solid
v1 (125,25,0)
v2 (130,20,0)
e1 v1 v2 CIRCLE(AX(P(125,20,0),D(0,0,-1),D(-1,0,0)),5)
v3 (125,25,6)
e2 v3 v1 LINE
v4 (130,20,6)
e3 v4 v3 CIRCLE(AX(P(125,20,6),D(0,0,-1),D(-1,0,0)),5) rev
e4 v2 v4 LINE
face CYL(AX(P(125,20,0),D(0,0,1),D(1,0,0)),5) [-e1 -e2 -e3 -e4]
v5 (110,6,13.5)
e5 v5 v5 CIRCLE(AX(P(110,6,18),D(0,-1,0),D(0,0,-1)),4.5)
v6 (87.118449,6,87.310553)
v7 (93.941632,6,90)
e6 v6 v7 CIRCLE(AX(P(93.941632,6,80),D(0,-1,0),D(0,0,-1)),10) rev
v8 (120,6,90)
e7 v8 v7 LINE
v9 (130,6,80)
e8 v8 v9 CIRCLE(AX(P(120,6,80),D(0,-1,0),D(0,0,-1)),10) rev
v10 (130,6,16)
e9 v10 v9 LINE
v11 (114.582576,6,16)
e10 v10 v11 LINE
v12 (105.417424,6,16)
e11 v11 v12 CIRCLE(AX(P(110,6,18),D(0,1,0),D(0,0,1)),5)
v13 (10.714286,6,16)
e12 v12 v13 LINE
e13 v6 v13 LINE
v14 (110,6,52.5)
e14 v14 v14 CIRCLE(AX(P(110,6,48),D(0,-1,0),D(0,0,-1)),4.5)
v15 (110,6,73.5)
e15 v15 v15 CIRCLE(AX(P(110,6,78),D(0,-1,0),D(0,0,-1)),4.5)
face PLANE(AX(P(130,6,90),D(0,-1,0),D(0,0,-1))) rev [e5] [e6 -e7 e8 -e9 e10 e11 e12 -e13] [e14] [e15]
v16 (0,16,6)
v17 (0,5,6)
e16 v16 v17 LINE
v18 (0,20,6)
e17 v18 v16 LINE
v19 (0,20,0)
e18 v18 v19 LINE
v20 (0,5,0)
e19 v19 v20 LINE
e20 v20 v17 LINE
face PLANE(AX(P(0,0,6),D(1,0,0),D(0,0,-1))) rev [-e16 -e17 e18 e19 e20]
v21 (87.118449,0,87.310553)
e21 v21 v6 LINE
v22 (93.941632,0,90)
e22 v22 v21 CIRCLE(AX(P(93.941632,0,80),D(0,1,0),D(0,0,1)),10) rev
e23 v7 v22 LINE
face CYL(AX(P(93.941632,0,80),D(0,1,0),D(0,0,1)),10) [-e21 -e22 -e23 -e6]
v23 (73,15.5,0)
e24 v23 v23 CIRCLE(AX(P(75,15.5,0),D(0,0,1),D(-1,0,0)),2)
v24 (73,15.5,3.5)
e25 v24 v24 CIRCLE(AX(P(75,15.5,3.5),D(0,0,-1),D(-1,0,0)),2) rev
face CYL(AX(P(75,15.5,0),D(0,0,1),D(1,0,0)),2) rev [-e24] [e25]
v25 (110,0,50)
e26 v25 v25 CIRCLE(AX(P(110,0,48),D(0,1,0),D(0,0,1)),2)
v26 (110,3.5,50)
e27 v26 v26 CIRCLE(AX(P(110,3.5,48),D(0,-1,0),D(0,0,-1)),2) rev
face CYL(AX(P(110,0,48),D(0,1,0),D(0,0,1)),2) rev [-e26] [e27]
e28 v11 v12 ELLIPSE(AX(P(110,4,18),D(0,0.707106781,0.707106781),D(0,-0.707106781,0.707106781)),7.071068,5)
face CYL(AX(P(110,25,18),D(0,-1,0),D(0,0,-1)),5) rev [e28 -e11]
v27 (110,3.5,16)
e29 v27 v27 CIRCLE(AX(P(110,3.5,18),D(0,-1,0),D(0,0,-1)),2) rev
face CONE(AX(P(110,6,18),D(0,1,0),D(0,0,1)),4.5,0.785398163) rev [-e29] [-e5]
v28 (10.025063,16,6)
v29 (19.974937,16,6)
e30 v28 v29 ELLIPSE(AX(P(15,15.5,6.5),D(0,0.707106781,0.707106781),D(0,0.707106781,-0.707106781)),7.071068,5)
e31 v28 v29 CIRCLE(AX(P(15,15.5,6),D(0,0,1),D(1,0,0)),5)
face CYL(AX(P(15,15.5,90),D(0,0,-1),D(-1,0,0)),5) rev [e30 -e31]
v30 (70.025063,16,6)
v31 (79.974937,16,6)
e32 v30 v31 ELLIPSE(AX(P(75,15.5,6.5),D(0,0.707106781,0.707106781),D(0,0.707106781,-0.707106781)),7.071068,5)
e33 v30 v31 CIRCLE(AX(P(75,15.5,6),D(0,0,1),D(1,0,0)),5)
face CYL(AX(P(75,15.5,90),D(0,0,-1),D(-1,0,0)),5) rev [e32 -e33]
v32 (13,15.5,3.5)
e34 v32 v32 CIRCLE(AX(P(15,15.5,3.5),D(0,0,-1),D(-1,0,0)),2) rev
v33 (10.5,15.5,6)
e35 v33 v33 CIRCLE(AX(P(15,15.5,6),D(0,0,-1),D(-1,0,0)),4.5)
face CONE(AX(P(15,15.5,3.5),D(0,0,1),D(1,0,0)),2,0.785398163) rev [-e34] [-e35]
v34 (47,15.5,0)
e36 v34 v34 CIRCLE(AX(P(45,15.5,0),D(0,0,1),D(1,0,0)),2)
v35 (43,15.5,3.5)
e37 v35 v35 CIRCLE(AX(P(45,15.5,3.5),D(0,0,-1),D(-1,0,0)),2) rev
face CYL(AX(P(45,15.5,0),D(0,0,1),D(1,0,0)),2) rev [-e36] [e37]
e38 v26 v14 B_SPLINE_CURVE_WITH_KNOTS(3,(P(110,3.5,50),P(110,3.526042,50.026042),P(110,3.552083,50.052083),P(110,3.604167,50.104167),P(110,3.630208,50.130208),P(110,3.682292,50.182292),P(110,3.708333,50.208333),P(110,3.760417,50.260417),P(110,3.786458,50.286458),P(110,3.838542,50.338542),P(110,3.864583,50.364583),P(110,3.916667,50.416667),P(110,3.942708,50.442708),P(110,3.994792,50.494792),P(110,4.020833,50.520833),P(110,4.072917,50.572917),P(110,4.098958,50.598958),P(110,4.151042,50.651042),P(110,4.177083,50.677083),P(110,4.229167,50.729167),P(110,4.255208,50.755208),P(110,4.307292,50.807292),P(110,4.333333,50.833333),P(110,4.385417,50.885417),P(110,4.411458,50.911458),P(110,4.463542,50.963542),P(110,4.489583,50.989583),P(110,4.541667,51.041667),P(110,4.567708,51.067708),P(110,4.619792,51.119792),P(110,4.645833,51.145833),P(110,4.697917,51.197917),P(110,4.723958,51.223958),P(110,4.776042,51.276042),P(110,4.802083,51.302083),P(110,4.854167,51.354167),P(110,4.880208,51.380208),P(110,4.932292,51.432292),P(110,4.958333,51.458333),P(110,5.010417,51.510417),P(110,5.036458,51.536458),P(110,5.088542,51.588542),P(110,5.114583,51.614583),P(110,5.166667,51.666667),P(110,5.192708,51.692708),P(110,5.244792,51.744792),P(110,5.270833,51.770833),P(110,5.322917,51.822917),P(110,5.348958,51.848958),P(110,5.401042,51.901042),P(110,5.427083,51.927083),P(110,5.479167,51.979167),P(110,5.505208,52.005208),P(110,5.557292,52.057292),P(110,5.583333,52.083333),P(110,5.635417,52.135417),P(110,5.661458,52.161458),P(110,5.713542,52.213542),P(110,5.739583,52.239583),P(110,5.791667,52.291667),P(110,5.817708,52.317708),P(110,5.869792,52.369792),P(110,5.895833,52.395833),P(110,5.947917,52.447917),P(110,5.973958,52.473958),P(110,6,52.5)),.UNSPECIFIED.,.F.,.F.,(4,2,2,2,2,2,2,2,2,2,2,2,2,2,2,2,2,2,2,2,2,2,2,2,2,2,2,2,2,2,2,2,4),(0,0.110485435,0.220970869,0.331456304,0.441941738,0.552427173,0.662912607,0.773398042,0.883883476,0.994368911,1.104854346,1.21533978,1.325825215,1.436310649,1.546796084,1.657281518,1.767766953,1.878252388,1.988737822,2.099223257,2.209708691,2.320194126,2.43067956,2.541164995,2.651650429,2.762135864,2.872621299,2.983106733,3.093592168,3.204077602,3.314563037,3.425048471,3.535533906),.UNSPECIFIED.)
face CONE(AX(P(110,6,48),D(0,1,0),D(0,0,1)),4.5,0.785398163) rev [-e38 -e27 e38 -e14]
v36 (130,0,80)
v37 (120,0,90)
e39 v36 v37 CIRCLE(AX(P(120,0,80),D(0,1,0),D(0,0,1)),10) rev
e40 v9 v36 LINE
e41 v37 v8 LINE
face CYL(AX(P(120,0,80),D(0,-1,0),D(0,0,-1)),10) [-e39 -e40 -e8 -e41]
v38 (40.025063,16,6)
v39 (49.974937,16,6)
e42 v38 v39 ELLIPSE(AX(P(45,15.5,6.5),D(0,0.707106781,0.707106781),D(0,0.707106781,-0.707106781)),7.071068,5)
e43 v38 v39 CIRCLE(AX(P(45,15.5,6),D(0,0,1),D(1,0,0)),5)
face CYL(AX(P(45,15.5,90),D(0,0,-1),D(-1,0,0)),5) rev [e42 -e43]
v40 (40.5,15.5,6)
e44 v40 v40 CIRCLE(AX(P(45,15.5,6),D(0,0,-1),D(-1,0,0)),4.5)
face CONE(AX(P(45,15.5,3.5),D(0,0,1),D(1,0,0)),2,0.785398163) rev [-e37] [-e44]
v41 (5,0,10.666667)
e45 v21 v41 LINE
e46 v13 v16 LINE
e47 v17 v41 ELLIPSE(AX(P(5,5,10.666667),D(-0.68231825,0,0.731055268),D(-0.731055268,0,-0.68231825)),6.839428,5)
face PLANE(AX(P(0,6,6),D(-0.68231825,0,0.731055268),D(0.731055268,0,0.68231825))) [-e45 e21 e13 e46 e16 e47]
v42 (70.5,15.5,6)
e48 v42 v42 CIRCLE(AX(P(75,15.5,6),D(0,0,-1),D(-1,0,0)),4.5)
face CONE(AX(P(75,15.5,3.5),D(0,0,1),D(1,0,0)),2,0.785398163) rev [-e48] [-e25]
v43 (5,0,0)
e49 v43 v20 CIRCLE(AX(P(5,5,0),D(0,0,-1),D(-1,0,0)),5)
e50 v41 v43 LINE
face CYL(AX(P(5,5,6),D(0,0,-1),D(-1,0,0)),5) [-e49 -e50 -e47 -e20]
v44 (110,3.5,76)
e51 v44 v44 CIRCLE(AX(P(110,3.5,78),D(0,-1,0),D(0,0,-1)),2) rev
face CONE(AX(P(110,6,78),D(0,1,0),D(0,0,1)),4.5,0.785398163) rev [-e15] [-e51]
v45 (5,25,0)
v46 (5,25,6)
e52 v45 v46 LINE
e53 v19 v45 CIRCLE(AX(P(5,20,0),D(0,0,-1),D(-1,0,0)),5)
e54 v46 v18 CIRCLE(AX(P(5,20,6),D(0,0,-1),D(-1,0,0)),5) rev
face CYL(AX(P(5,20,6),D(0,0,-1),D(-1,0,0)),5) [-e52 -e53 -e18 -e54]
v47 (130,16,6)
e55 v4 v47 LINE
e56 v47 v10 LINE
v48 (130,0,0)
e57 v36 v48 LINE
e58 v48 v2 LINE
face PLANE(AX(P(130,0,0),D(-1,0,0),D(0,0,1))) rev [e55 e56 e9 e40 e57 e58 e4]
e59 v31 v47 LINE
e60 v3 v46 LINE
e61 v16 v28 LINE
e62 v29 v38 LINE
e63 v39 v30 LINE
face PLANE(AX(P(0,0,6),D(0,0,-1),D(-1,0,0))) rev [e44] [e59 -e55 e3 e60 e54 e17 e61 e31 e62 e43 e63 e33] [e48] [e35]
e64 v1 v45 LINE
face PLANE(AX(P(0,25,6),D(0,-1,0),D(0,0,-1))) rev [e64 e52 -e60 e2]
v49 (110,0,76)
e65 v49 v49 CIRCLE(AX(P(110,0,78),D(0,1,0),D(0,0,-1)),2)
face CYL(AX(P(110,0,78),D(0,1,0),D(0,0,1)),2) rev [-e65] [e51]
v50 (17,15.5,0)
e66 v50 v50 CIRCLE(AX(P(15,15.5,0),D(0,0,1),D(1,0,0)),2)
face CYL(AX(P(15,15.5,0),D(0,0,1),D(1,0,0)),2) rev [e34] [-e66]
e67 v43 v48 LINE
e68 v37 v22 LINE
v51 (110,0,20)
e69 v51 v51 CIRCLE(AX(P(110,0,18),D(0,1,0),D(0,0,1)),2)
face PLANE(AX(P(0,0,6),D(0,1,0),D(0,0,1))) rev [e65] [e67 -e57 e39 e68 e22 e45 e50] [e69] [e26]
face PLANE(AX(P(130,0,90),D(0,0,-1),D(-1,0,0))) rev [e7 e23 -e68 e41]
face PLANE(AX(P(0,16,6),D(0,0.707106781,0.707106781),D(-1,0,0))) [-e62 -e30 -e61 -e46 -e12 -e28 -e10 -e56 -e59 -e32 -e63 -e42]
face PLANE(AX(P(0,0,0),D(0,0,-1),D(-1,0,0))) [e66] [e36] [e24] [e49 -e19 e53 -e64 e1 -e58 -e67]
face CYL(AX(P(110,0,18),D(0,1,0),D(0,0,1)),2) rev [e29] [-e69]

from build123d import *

# Parameters (mm, degrees)
ESQUISSE1_W                  = 90
ESQUISSE1_H                  = 25
BOSS_EXTRU_1_DEPTH           = 6
ESQUISSE2_W                  = 90
ESQUISSE2_H                  = 6
BOSS_EXTRU_2_DEPTH           = 40
ESQUISSE3_W                  = 40
ESQUISSE3_H                  = 6
BOSS_EXTRU_3_DEPTH           = 19
BOSS_EXTRU_4_DEPTH           = 6
ESQUISSE5_R                  = 2
ENL_V_MAT_EXTRU_1_DEPTH      = 157.783289926
ENL_V_MAT_EXTRU_2_DEPTH      = 160.25137362
ENL_V_MAT_EXTRU_2_DEPTH_BACK = 160.25137362
ESQUISSE6_R                  = 2
CHANFREIN1_SIZE              = 10
ESQUISSE7_R                  = 5
ENL_V_MAT_EXTRU_3_DEPTH      = 157.783289926
ESQUISSE8_R                  = 5
ENL_V_MAT_EXTRU_4_DEPTH      = 160.25137362
CHANFREIN3_SIZE              = 2.5
CONG_1_R                     = 10
CONG_2_R                     = 5


with BuildPart() as part:
    # Esquisse1 → Boss.-Extru.1 (new body)
    with BuildSketch(Plane.XY):
        with Locations((45, 12.5)):
            Rectangle(ESQUISSE1_W, ESQUISSE1_H)
    extrude(amount=BOSS_EXTRU_1_DEPTH)

    # Esquisse2 → Boss.-Extru.2 (add)
    with BuildSketch(Plane(origin=(90, 0, 0), x_dir=(0, 0, -1), z_dir=(1, 0, 0))):
        with Locations((-45, 3)):
            Rectangle(ESQUISSE2_W, ESQUISSE2_H)
    extrude(amount=BOSS_EXTRU_2_DEPTH)

    # Esquisse3 → Boss.-Extru.3 (add)
    with BuildSketch(Plane(origin=(0, 6, 0), x_dir=(1, 0, 0), z_dir=(0, 1, 0))):
        with Locations((110, -3)):
            Rectangle(ESQUISSE3_W, ESQUISSE3_H)
    extrude(amount=BOSS_EXTRU_3_DEPTH)

    # Esquisse4 → Boss.-Extru.4 (add)
    with BuildSketch(Plane.XZ):
        Polygon((0, 6), (90, 90), (90, 6), align=None)
    extrude(amount=-BOSS_EXTRU_4_DEPTH)

    # Esquisse5 → Enlèv. mat.-Extru.1 (cut, through all)
    with BuildSketch(Plane.XY.offset(6)):
        with Locations((45, 15.5)):
            Circle(ESQUISSE5_R)
        with Locations((15, 15.5)):
            Circle(ESQUISSE5_R)
        with Locations(Location((75, 15.5, 0), (0, 0, 180))):
            Circle(ESQUISSE5_R)
    extrude(amount=-ENL_V_MAT_EXTRU_1_DEPTH, mode=Mode.SUBTRACT)

    # Esquisse6 → Enlèv. mat.-Extru.2 (cut, two sides: drawn at the far end of the back side and taken through both)
    with BuildSketch(Plane(origin=(0, 6, 0), x_dir=(1, 0, 0), z_dir=(0, 1, 0)).offset(-ENL_V_MAT_EXTRU_2_DEPTH_BACK)):
        with Locations(Location((110, -48, 0), (0, 0, 270))):
            Circle(ESQUISSE6_R)
        with Locations(Location((110, -18, 0), (0, 0, 270))):
            Circle(ESQUISSE6_R)
        with Locations(Location((110, -78, 0), (0, 0, 90))):
            Circle(ESQUISSE6_R)
    extrude(amount=ENL_V_MAT_EXTRU_2_DEPTH + ENL_V_MAT_EXTRU_2_DEPTH_BACK, mode=Mode.SUBTRACT)

    # Chanfrein1
    # the kernel refuses this chamfer: 10 mm, written as the material it adds along each edge
    with BuildSketch(Plane(origin=(0, 6, 6), x_dir=(0, 0.9996219169112968, -0.027495876610586403), z_dir=(1, 0, 0))) as chanfrein1_piece_1_section:
        Polygon((CHANFREIN1_SIZE * 0.999621916911, CHANFREIN1_SIZE * 0.0274958766106), (-CHANFREIN1_SIZE * 0.0274958766106, CHANFREIN1_SIZE * 0.999621916911), (0, 0), align=None)
    chanfrein1_piece_1 = extrude(amount=130, mode=Mode.PRIVATE)
    chanfrein1_piece_1 = split(chanfrein1_piece_1, bisect_by=Plane(origin=(37.357692618, 9.297592043, 40.867179777), z_dir=(0.6823182503600111, 0, -0.7310552682428691)), keep=Keep.TOP, mode=Mode.PRIVATE)
    chanfrein1_piece_1 = chanfrein1_piece_1 - Plane(origin=(110, 9.297592043, 18), x_dir=(0, 0, 1), z_dir=(0, 1, 0)) * Cylinder(2, 300, mode=Mode.PRIVATE)
    chanfrein1_piece_1 = chanfrein1_piece_1 - Plane(origin=(15, 15.5, 9.259179561), x_dir=(1, 0, 0), z_dir=(0, 0, 1)) * Cylinder(2, 300, mode=Mode.PRIVATE)
    chanfrein1_piece_1 = chanfrein1_piece_1 - Plane(origin=(45, 15.5, 9.259179561), x_dir=(1, 0, 0), z_dir=(0, 0, 1)) * Cylinder(2, 300, mode=Mode.PRIVATE)
    chanfrein1_piece_1 = chanfrein1_piece_1 - Plane(origin=(75, 15.5, 9.259179561), x_dir=(-1, 0, 0), z_dir=(0, 0, 1)) * Cylinder(2, 300, mode=Mode.PRIVATE)
    add(chanfrein1_piece_1)

    # Esquisse7 → Enlèv. mat.-Extru.3 (cut, through all)
    with BuildSketch(Plane.XY.offset(6)):
        with Locations((45, 15.5)):
            Circle(ESQUISSE7_R)
        with Locations((15, 15.5)):
            Circle(ESQUISSE7_R)
        with Locations((75, 15.5)):
            Circle(ESQUISSE7_R)
    extrude(amount=ENL_V_MAT_EXTRU_3_DEPTH, mode=Mode.SUBTRACT)

    # Esquisse8 → Enlèv. mat.-Extru.4 (cut, through all)
    with BuildSketch(Plane(origin=(0, 6, 0), x_dir=(1, 0, 0), z_dir=(0, 1, 0))):
        with Locations((110, -18)):
            Circle(ESQUISSE8_R)
    extrude(amount=ENL_V_MAT_EXTRU_4_DEPTH, mode=Mode.SUBTRACT)

    # Chanfrein3
    chanfrein3_edges = [part.edges().sort_by_distance(p)[0] for p in [
        (43, 15.5, 6),
        (13, 15.5, 6),
        (77, 15.5, 6),
        (110, 6, 46),
        (110, 6, 16),
        (110, 6, 80),
    ]]
    chamfer(chanfrein3_edges, length=CHANFREIN3_SIZE)

    # Congé1
    cong_1_edges = [part.edges().sort_by_distance(p)[0] for p in [
        (90, 3, 90),
        (130, 3, 90),
    ]]
    fillet(cong_1_edges, radius=CONG_1_R)

    # Congé2
    cong_2_edges = [part.edges().sort_by_distance(p)[0] for p in [
        (130, 25, 3),
        (0, 25, 3),
        (0, 0, 3),
    ]]
    fillet(cong_2_edges, radius=CONG_2_R)


solid = part.part
